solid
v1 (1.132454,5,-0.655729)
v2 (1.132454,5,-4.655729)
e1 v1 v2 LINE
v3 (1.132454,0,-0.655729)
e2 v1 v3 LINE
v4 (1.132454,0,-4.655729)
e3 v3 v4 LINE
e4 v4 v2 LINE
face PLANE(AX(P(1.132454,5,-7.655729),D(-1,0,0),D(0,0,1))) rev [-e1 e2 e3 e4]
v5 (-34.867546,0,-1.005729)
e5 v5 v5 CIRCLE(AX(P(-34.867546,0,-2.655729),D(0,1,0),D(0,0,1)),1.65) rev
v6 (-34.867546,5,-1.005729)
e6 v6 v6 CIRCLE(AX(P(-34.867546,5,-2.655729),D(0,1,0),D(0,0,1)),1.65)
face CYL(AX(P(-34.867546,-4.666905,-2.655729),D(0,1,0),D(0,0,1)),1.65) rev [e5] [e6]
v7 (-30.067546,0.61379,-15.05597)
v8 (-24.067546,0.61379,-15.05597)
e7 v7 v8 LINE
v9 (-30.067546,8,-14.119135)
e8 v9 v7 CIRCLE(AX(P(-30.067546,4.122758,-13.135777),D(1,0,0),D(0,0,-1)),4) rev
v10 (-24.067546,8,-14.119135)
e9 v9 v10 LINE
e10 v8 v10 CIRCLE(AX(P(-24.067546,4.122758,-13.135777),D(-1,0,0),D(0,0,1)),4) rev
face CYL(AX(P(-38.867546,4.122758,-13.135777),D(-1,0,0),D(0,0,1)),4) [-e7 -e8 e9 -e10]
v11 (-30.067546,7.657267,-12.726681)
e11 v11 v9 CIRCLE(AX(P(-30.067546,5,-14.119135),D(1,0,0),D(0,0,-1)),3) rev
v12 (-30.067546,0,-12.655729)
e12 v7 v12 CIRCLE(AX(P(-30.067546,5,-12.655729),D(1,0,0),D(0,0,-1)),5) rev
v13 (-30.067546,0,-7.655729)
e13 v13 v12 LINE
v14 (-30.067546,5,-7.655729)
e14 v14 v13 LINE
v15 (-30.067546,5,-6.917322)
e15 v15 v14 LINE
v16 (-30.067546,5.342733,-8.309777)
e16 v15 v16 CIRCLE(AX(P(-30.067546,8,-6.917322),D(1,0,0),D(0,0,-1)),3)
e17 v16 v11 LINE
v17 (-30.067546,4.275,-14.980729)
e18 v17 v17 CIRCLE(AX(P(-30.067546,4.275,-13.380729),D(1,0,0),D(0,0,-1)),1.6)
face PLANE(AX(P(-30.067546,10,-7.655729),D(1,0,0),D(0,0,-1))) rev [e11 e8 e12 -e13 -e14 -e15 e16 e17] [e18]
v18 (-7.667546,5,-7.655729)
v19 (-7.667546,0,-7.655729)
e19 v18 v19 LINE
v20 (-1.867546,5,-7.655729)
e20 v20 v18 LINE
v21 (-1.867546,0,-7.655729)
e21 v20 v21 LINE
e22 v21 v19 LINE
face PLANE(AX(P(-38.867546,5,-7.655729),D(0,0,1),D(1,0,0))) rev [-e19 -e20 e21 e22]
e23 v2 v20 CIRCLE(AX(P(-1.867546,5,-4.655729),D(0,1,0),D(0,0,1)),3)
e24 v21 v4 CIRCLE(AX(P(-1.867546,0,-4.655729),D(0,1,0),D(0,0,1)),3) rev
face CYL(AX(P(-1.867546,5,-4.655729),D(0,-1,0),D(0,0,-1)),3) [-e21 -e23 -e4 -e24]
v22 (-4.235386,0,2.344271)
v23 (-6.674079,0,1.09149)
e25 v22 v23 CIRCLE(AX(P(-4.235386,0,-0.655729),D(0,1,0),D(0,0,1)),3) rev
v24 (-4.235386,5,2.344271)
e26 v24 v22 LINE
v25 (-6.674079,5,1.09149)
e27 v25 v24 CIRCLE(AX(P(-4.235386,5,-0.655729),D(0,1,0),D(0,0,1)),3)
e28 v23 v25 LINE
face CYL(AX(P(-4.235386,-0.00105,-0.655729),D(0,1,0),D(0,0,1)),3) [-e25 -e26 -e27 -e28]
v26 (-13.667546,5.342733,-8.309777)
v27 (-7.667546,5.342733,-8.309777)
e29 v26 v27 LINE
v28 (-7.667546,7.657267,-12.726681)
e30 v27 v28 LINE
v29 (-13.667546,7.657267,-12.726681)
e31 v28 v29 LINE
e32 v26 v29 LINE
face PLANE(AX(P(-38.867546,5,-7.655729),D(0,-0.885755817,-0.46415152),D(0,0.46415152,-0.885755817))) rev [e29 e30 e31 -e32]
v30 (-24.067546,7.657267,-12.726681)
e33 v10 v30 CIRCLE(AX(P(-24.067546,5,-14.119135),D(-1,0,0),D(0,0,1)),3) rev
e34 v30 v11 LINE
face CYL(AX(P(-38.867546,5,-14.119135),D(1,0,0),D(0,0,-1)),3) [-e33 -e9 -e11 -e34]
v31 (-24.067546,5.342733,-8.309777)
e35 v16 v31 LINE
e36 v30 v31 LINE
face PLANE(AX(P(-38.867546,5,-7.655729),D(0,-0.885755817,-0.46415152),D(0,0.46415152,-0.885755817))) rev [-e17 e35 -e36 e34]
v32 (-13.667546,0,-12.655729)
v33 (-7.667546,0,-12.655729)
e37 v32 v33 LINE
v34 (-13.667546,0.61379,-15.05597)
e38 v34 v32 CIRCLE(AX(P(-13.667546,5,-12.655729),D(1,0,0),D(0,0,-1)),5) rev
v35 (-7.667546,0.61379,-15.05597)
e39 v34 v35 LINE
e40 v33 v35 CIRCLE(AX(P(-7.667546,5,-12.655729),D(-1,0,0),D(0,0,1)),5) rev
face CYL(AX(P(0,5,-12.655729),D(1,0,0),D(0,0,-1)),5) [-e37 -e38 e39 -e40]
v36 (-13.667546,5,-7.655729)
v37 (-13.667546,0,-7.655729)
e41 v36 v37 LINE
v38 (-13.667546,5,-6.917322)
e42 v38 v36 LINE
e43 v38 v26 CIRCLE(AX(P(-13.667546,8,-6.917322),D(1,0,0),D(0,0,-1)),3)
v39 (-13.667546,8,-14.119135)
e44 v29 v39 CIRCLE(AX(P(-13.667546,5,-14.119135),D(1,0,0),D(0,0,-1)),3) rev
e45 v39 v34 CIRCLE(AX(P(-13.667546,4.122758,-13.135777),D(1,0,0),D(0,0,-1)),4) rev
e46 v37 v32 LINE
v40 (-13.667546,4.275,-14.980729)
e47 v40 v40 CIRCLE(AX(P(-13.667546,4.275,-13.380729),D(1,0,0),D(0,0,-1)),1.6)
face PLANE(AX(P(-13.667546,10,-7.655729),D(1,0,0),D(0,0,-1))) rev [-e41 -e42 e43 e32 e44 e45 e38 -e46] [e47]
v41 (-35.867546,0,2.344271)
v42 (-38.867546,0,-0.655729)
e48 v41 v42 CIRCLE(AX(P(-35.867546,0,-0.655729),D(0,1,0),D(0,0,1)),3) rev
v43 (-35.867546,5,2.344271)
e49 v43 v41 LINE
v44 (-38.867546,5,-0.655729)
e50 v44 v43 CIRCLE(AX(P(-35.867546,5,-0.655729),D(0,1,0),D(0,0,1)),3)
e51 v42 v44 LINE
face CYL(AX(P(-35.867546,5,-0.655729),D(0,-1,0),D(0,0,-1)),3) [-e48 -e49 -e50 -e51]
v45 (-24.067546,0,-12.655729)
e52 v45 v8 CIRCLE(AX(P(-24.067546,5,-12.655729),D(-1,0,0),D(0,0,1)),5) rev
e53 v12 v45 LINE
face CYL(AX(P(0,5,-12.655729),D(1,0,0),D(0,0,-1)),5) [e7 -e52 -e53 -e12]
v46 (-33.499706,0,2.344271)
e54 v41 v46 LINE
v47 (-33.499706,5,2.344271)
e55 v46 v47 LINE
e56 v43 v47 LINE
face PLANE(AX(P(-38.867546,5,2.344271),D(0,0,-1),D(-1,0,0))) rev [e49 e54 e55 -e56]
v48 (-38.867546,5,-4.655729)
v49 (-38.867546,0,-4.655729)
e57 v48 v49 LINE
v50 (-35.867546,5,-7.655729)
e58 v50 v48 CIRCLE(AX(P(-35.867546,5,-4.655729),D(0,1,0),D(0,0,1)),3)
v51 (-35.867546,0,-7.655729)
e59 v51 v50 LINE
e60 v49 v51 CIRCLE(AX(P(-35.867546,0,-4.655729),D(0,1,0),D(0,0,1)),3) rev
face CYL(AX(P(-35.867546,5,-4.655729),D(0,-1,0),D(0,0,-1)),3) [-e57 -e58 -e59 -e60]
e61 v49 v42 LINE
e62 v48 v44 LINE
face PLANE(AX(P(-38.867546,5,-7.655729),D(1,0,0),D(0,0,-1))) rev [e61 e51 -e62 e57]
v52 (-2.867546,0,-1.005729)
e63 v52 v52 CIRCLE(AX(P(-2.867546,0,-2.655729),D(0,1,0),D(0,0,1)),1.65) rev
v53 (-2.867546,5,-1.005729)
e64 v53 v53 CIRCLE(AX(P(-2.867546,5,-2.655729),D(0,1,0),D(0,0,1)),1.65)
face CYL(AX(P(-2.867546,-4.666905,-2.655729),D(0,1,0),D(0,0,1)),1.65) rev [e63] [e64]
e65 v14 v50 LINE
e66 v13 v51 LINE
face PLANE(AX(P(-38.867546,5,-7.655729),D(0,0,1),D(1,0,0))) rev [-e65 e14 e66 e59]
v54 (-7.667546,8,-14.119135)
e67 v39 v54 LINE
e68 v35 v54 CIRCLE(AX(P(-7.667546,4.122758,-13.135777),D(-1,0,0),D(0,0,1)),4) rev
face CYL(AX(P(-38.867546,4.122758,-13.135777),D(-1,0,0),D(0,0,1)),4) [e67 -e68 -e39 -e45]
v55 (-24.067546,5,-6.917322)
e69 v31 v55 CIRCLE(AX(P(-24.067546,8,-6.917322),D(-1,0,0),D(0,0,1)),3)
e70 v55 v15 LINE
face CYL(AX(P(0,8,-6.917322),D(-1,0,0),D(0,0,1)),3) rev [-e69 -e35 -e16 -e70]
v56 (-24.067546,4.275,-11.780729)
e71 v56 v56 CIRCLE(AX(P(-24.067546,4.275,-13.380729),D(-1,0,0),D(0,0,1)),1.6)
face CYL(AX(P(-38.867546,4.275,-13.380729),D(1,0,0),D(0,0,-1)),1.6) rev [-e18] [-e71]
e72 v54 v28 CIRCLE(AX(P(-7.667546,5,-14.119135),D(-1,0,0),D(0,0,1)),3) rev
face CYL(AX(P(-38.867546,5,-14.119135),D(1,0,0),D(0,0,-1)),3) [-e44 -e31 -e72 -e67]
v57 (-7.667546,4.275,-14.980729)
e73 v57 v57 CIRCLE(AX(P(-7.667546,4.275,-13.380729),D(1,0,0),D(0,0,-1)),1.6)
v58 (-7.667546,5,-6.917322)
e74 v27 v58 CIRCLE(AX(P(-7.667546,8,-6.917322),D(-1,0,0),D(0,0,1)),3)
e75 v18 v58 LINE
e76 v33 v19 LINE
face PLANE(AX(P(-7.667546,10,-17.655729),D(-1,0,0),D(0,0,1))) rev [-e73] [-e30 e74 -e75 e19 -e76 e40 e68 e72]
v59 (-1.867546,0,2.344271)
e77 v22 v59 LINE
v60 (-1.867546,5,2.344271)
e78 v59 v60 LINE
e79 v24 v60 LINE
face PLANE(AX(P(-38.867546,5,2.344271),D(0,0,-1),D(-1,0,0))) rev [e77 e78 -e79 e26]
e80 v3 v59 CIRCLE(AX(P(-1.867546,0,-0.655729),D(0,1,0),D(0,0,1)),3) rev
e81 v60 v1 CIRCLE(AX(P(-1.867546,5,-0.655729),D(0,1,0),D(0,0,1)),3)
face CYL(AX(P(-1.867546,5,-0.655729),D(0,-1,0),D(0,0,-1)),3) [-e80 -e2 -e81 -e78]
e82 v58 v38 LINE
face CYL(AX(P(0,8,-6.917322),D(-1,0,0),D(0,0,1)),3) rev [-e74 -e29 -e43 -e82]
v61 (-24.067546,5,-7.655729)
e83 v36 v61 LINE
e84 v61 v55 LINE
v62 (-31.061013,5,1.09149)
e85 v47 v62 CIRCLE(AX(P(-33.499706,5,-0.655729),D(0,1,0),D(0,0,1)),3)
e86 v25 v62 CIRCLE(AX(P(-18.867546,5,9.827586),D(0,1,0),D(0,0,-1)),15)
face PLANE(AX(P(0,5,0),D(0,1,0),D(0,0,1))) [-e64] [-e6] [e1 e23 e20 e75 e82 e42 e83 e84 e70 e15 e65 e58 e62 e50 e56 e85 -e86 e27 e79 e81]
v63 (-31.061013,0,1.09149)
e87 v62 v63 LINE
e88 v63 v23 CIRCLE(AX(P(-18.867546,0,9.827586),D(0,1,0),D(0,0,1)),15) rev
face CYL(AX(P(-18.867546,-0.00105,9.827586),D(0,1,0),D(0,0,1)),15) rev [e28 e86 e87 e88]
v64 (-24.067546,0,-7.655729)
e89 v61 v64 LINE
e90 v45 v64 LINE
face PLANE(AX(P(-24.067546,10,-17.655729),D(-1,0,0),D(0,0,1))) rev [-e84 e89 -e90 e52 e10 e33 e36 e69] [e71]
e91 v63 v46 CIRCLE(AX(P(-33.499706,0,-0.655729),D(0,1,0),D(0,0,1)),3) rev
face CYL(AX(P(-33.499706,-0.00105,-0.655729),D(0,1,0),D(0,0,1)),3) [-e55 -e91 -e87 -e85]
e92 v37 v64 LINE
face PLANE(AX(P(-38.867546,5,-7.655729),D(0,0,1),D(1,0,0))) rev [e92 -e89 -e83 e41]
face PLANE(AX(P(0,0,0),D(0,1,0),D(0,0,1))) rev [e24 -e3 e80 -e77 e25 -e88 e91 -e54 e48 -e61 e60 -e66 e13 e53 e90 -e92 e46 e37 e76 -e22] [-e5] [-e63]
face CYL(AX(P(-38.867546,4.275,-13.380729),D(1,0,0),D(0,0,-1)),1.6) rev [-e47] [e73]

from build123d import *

# Parameters (mm, degrees)
ESQUISSE1_W                    = 40
ESQUISSE1_H                    = 10
BOSS_EXTRU_1_DEPTH             = 5
ESQUISSE2_R                    = 1.65
ENL_V_MAT_EXTRU_1_DEPTH        = 5
BOSS_EXTRU_2_REACH             = 41.929
ESQUISSE3_W                    = 6
ESQUISSE3_H                    = 10
BOSS_EXTRU_2_DIRECTION_2_DEPTH = 5
ESQUISSE4_R                    = 1.6
ENL_V_MAT_EXTRU_2_DEPTH        = 38.217801601
CONG_1_R                       = 5
ENL_V_MAT_EXTRU_3_DEPTH        = 38.217801601
CONG_3_R                       = 3
CONG_4_R                       = 3
CONG_5_R                       = 3
ENL_V_MAT_EXTRU_4_REACH        = 44.982
CONG_6_R                       = 3
CONG_7_START                   = -30.067545716
CONG_7_DEPTH                   = 22.4


with BuildPart() as part:
    # Esquisse1 → Boss.-Extru.1 (new body)
    with BuildSketch(Plane(origin=(0, 0, 0), x_dir=(1, 0, 0), z_dir=(0, 1, 0))):
        with Locations((-18.867545716, 2.655728702)):
            Rectangle(ESQUISSE1_W, ESQUISSE1_H)
    extrude(amount=BOSS_EXTRU_1_DEPTH)

    # Esquisse2 → Enlèv. mat.-Extru.1 (cut)
    with BuildSketch(Plane(origin=(0, 5, 0), x_dir=(1, 0, 0), z_dir=(0, 1, 0))):
        with Locations(Location((-34.867545716, 2.655728702, 0), (0, 0, 270))):
            Circle(ESQUISSE2_R)
        with Locations(Location((-2.867545716, 2.655728702, 0), (0, 0, 270))):
            Circle(ESQUISSE2_R)
    extrude(amount=-ENL_V_MAT_EXTRU_1_DEPTH, mode=Mode.SUBTRACT)

    # Boss.-Extru.2: up to this face of the body (flat: up to its plane)
    boss_extru_2_end = Plane(part.part.faces().sort_by_distance((-18.867545716, 0, -2.655728702))[0])
    # Esquisse3 → Boss.-Extru.2 (add, up to the picked face)
    with BuildSketch(Plane(origin=(0, 5, 0), x_dir=(1, 0, 0), z_dir=(0, 1, 0)), mode=Mode.PRIVATE) as boss_extru_2_sk1:
        with Locations((-10.667545716, 12.655728702)):
            Rectangle(ESQUISSE3_W, ESQUISSE3_H)
    boss_extru_2_tool1 = split(extrude(boss_extru_2_sk1.sketch, amount=-BOSS_EXTRU_2_REACH, mode=Mode.PRIVATE), bisect_by=boss_extru_2_end, keep=Keep.BOTH, mode=Mode.PRIVATE)
    # Esquisse3 → Boss.-Extru.2 (add, up to the picked face)
    with BuildSketch(Plane(origin=(0, 5, 0), x_dir=(1, 0, 0), z_dir=(0, 1, 0)), mode=Mode.PRIVATE) as boss_extru_2_sk2:
        with Locations((-27.067545716, 12.655728702)):
            Rectangle(ESQUISSE3_W, ESQUISSE3_H)
    boss_extru_2_tool2 = split(extrude(boss_extru_2_sk2.sketch, amount=-BOSS_EXTRU_2_REACH, mode=Mode.PRIVATE), bisect_by=boss_extru_2_end, keep=Keep.BOTH, mode=Mode.PRIVATE)
    add(boss_extru_2_tool1.solids().sort_by(Axis((-10.667546, 5, -12.655729), (0, -1, 0)))[0])
    add(boss_extru_2_tool2.solids().sort_by(Axis((-27.067546, 5, -12.655729), (0, -1, 0)))[0])

    # Esquisse3 → Boss.-Extru.2 direction 2 (add)
    with BuildSketch(Plane(origin=(0, 5, 0), x_dir=(1, 0, 0), z_dir=(0, 1, 0))):
        with Locations((-10.667545716, 12.655728702)):
            Rectangle(ESQUISSE3_W, ESQUISSE3_H)
        with Locations((-27.067545716, 12.655728702)):
            Rectangle(ESQUISSE3_W, ESQUISSE3_H)
    extrude(amount=BOSS_EXTRU_2_DIRECTION_2_DEPTH)

    # Esquisse4 → Enlèv. mat.-Extru.2 (cut, through all)
    with BuildSketch(Plane(origin=(-7.667545716, 0, 0), x_dir=(0, 0, -1), z_dir=(1, 0, 0))):
        with Locations((13.380728702, 4.275)):
            Circle(ESQUISSE4_R)
    extrude(amount=-ENL_V_MAT_EXTRU_2_DEPTH, mode=Mode.SUBTRACT)

    # Congé1
    cong_1_edges = [part.edges().sort_by_distance(p)[0] for p in [
        (-27.067545716, 0, -17.655728702),
        (-10.667545716, 0, -17.655728702),
    ]]
    fillet(cong_1_edges, radius=CONG_1_R)

    # Esquisse5 → Enlèv. mat.-Extru.3 (cut, through all)
    with BuildSketch(Plane(origin=(-7.667545716, 0, 0), x_dir=(0, 0, -1), z_dir=(1, 0, 0))):
        Polygon((7.655728702, 5), (13.380728702, 8), (17.655728702, 8), (17.655728702, 10), (7.655728702, 10), align=None)
    extrude(amount=-ENL_V_MAT_EXTRU_3_DEPTH, mode=Mode.SUBTRACT)

    # Congé3
    cong_3_edges = [part.edges().sort_by_distance(p)[0] for p in [
        (-10.667545716, 8, -13.380728702),
        (-27.067545716, 8, -13.380728702),
    ]]
    fillet(cong_3_edges, radius=CONG_3_R)

    # Congé4
    cong_4_edges = [part.edges().sort_by_distance(p)[0] for p in [
        (-10.667545716, 5, -7.655728702),
        (-27.067545716, 5, -7.655728702),
    ]]
    fillet(cong_4_edges, radius=CONG_4_R)

    # Congé5
    cong_5_edges = [part.edges().sort_by_distance(p)[0] for p in [
        (-38.867545716, 2.5, -7.655728702),
        (-38.867545716, 2.5, 2.344271298),
        (1.132454284, 2.5, 2.344271298),
        (1.132454284, 2.5, -7.655728702),
    ]]
    fillet(cong_5_edges, radius=CONG_5_R)

    # Esquisse6 → Enlèv. mat.-Extru.4 (cut, up to next)
    with BuildSketch(Plane(origin=(0, 5, 0), x_dir=(1, 0, 0), z_dir=(0, 1, 0)), mode=Mode.PRIVATE) as enl_v_mat_extru_4_sk1:
        with BuildLine():
            Line((-31.867545716, -2.344271298), (-5.867545716, -2.344271298))
            ThreePointArc((-5.867545716, -2.344271298), (-18.867545716, 5.172413928), (-31.867545716, -2.344271298))
        make_face()
    enl_v_mat_extru_4_tool1 = extrude(enl_v_mat_extru_4_sk1.sketch, amount=-ENL_V_MAT_EXTRU_4_REACH, mode=Mode.PRIVATE) & part.part
    add(enl_v_mat_extru_4_tool1.solids().sort_by_distance((-18.867546, 5, -0.73807))[0], mode=Mode.SUBTRACT)

    # Congé6
    cong_6_edges = [part.edges().sort_by_distance(p)[0] for p in [
        (-31.867545716, 2.5, 2.344271298),
        (-5.867545716, 2.5, 2.344271298),
    ]]
    fillet(cong_6_edges, radius=CONG_6_R)

    # Congé7: read off the stored shape, not the designer's step
    # Congé7 outline → Congé7 (cut)
    with BuildSketch(Plane.YZ.offset(CONG_7_START)):
        with BuildLine():
            Line((8, -17.655728702), (8, -14.119135311))
            ThreePointArc((8, -14.119135311), (4.626068057, -17.103985452), (0.613789507, -15.055969837))
            ThreePointArc((0.613789507, -15.055969837), (2.450608472, -16.956961414), (5, -17.655728702))
            Line((5, -17.655728702), (8, -17.655728702))
        make_face()
    extrude(amount=CONG_7_DEPTH, mode=Mode.SUBTRACT)


solid = part.part
